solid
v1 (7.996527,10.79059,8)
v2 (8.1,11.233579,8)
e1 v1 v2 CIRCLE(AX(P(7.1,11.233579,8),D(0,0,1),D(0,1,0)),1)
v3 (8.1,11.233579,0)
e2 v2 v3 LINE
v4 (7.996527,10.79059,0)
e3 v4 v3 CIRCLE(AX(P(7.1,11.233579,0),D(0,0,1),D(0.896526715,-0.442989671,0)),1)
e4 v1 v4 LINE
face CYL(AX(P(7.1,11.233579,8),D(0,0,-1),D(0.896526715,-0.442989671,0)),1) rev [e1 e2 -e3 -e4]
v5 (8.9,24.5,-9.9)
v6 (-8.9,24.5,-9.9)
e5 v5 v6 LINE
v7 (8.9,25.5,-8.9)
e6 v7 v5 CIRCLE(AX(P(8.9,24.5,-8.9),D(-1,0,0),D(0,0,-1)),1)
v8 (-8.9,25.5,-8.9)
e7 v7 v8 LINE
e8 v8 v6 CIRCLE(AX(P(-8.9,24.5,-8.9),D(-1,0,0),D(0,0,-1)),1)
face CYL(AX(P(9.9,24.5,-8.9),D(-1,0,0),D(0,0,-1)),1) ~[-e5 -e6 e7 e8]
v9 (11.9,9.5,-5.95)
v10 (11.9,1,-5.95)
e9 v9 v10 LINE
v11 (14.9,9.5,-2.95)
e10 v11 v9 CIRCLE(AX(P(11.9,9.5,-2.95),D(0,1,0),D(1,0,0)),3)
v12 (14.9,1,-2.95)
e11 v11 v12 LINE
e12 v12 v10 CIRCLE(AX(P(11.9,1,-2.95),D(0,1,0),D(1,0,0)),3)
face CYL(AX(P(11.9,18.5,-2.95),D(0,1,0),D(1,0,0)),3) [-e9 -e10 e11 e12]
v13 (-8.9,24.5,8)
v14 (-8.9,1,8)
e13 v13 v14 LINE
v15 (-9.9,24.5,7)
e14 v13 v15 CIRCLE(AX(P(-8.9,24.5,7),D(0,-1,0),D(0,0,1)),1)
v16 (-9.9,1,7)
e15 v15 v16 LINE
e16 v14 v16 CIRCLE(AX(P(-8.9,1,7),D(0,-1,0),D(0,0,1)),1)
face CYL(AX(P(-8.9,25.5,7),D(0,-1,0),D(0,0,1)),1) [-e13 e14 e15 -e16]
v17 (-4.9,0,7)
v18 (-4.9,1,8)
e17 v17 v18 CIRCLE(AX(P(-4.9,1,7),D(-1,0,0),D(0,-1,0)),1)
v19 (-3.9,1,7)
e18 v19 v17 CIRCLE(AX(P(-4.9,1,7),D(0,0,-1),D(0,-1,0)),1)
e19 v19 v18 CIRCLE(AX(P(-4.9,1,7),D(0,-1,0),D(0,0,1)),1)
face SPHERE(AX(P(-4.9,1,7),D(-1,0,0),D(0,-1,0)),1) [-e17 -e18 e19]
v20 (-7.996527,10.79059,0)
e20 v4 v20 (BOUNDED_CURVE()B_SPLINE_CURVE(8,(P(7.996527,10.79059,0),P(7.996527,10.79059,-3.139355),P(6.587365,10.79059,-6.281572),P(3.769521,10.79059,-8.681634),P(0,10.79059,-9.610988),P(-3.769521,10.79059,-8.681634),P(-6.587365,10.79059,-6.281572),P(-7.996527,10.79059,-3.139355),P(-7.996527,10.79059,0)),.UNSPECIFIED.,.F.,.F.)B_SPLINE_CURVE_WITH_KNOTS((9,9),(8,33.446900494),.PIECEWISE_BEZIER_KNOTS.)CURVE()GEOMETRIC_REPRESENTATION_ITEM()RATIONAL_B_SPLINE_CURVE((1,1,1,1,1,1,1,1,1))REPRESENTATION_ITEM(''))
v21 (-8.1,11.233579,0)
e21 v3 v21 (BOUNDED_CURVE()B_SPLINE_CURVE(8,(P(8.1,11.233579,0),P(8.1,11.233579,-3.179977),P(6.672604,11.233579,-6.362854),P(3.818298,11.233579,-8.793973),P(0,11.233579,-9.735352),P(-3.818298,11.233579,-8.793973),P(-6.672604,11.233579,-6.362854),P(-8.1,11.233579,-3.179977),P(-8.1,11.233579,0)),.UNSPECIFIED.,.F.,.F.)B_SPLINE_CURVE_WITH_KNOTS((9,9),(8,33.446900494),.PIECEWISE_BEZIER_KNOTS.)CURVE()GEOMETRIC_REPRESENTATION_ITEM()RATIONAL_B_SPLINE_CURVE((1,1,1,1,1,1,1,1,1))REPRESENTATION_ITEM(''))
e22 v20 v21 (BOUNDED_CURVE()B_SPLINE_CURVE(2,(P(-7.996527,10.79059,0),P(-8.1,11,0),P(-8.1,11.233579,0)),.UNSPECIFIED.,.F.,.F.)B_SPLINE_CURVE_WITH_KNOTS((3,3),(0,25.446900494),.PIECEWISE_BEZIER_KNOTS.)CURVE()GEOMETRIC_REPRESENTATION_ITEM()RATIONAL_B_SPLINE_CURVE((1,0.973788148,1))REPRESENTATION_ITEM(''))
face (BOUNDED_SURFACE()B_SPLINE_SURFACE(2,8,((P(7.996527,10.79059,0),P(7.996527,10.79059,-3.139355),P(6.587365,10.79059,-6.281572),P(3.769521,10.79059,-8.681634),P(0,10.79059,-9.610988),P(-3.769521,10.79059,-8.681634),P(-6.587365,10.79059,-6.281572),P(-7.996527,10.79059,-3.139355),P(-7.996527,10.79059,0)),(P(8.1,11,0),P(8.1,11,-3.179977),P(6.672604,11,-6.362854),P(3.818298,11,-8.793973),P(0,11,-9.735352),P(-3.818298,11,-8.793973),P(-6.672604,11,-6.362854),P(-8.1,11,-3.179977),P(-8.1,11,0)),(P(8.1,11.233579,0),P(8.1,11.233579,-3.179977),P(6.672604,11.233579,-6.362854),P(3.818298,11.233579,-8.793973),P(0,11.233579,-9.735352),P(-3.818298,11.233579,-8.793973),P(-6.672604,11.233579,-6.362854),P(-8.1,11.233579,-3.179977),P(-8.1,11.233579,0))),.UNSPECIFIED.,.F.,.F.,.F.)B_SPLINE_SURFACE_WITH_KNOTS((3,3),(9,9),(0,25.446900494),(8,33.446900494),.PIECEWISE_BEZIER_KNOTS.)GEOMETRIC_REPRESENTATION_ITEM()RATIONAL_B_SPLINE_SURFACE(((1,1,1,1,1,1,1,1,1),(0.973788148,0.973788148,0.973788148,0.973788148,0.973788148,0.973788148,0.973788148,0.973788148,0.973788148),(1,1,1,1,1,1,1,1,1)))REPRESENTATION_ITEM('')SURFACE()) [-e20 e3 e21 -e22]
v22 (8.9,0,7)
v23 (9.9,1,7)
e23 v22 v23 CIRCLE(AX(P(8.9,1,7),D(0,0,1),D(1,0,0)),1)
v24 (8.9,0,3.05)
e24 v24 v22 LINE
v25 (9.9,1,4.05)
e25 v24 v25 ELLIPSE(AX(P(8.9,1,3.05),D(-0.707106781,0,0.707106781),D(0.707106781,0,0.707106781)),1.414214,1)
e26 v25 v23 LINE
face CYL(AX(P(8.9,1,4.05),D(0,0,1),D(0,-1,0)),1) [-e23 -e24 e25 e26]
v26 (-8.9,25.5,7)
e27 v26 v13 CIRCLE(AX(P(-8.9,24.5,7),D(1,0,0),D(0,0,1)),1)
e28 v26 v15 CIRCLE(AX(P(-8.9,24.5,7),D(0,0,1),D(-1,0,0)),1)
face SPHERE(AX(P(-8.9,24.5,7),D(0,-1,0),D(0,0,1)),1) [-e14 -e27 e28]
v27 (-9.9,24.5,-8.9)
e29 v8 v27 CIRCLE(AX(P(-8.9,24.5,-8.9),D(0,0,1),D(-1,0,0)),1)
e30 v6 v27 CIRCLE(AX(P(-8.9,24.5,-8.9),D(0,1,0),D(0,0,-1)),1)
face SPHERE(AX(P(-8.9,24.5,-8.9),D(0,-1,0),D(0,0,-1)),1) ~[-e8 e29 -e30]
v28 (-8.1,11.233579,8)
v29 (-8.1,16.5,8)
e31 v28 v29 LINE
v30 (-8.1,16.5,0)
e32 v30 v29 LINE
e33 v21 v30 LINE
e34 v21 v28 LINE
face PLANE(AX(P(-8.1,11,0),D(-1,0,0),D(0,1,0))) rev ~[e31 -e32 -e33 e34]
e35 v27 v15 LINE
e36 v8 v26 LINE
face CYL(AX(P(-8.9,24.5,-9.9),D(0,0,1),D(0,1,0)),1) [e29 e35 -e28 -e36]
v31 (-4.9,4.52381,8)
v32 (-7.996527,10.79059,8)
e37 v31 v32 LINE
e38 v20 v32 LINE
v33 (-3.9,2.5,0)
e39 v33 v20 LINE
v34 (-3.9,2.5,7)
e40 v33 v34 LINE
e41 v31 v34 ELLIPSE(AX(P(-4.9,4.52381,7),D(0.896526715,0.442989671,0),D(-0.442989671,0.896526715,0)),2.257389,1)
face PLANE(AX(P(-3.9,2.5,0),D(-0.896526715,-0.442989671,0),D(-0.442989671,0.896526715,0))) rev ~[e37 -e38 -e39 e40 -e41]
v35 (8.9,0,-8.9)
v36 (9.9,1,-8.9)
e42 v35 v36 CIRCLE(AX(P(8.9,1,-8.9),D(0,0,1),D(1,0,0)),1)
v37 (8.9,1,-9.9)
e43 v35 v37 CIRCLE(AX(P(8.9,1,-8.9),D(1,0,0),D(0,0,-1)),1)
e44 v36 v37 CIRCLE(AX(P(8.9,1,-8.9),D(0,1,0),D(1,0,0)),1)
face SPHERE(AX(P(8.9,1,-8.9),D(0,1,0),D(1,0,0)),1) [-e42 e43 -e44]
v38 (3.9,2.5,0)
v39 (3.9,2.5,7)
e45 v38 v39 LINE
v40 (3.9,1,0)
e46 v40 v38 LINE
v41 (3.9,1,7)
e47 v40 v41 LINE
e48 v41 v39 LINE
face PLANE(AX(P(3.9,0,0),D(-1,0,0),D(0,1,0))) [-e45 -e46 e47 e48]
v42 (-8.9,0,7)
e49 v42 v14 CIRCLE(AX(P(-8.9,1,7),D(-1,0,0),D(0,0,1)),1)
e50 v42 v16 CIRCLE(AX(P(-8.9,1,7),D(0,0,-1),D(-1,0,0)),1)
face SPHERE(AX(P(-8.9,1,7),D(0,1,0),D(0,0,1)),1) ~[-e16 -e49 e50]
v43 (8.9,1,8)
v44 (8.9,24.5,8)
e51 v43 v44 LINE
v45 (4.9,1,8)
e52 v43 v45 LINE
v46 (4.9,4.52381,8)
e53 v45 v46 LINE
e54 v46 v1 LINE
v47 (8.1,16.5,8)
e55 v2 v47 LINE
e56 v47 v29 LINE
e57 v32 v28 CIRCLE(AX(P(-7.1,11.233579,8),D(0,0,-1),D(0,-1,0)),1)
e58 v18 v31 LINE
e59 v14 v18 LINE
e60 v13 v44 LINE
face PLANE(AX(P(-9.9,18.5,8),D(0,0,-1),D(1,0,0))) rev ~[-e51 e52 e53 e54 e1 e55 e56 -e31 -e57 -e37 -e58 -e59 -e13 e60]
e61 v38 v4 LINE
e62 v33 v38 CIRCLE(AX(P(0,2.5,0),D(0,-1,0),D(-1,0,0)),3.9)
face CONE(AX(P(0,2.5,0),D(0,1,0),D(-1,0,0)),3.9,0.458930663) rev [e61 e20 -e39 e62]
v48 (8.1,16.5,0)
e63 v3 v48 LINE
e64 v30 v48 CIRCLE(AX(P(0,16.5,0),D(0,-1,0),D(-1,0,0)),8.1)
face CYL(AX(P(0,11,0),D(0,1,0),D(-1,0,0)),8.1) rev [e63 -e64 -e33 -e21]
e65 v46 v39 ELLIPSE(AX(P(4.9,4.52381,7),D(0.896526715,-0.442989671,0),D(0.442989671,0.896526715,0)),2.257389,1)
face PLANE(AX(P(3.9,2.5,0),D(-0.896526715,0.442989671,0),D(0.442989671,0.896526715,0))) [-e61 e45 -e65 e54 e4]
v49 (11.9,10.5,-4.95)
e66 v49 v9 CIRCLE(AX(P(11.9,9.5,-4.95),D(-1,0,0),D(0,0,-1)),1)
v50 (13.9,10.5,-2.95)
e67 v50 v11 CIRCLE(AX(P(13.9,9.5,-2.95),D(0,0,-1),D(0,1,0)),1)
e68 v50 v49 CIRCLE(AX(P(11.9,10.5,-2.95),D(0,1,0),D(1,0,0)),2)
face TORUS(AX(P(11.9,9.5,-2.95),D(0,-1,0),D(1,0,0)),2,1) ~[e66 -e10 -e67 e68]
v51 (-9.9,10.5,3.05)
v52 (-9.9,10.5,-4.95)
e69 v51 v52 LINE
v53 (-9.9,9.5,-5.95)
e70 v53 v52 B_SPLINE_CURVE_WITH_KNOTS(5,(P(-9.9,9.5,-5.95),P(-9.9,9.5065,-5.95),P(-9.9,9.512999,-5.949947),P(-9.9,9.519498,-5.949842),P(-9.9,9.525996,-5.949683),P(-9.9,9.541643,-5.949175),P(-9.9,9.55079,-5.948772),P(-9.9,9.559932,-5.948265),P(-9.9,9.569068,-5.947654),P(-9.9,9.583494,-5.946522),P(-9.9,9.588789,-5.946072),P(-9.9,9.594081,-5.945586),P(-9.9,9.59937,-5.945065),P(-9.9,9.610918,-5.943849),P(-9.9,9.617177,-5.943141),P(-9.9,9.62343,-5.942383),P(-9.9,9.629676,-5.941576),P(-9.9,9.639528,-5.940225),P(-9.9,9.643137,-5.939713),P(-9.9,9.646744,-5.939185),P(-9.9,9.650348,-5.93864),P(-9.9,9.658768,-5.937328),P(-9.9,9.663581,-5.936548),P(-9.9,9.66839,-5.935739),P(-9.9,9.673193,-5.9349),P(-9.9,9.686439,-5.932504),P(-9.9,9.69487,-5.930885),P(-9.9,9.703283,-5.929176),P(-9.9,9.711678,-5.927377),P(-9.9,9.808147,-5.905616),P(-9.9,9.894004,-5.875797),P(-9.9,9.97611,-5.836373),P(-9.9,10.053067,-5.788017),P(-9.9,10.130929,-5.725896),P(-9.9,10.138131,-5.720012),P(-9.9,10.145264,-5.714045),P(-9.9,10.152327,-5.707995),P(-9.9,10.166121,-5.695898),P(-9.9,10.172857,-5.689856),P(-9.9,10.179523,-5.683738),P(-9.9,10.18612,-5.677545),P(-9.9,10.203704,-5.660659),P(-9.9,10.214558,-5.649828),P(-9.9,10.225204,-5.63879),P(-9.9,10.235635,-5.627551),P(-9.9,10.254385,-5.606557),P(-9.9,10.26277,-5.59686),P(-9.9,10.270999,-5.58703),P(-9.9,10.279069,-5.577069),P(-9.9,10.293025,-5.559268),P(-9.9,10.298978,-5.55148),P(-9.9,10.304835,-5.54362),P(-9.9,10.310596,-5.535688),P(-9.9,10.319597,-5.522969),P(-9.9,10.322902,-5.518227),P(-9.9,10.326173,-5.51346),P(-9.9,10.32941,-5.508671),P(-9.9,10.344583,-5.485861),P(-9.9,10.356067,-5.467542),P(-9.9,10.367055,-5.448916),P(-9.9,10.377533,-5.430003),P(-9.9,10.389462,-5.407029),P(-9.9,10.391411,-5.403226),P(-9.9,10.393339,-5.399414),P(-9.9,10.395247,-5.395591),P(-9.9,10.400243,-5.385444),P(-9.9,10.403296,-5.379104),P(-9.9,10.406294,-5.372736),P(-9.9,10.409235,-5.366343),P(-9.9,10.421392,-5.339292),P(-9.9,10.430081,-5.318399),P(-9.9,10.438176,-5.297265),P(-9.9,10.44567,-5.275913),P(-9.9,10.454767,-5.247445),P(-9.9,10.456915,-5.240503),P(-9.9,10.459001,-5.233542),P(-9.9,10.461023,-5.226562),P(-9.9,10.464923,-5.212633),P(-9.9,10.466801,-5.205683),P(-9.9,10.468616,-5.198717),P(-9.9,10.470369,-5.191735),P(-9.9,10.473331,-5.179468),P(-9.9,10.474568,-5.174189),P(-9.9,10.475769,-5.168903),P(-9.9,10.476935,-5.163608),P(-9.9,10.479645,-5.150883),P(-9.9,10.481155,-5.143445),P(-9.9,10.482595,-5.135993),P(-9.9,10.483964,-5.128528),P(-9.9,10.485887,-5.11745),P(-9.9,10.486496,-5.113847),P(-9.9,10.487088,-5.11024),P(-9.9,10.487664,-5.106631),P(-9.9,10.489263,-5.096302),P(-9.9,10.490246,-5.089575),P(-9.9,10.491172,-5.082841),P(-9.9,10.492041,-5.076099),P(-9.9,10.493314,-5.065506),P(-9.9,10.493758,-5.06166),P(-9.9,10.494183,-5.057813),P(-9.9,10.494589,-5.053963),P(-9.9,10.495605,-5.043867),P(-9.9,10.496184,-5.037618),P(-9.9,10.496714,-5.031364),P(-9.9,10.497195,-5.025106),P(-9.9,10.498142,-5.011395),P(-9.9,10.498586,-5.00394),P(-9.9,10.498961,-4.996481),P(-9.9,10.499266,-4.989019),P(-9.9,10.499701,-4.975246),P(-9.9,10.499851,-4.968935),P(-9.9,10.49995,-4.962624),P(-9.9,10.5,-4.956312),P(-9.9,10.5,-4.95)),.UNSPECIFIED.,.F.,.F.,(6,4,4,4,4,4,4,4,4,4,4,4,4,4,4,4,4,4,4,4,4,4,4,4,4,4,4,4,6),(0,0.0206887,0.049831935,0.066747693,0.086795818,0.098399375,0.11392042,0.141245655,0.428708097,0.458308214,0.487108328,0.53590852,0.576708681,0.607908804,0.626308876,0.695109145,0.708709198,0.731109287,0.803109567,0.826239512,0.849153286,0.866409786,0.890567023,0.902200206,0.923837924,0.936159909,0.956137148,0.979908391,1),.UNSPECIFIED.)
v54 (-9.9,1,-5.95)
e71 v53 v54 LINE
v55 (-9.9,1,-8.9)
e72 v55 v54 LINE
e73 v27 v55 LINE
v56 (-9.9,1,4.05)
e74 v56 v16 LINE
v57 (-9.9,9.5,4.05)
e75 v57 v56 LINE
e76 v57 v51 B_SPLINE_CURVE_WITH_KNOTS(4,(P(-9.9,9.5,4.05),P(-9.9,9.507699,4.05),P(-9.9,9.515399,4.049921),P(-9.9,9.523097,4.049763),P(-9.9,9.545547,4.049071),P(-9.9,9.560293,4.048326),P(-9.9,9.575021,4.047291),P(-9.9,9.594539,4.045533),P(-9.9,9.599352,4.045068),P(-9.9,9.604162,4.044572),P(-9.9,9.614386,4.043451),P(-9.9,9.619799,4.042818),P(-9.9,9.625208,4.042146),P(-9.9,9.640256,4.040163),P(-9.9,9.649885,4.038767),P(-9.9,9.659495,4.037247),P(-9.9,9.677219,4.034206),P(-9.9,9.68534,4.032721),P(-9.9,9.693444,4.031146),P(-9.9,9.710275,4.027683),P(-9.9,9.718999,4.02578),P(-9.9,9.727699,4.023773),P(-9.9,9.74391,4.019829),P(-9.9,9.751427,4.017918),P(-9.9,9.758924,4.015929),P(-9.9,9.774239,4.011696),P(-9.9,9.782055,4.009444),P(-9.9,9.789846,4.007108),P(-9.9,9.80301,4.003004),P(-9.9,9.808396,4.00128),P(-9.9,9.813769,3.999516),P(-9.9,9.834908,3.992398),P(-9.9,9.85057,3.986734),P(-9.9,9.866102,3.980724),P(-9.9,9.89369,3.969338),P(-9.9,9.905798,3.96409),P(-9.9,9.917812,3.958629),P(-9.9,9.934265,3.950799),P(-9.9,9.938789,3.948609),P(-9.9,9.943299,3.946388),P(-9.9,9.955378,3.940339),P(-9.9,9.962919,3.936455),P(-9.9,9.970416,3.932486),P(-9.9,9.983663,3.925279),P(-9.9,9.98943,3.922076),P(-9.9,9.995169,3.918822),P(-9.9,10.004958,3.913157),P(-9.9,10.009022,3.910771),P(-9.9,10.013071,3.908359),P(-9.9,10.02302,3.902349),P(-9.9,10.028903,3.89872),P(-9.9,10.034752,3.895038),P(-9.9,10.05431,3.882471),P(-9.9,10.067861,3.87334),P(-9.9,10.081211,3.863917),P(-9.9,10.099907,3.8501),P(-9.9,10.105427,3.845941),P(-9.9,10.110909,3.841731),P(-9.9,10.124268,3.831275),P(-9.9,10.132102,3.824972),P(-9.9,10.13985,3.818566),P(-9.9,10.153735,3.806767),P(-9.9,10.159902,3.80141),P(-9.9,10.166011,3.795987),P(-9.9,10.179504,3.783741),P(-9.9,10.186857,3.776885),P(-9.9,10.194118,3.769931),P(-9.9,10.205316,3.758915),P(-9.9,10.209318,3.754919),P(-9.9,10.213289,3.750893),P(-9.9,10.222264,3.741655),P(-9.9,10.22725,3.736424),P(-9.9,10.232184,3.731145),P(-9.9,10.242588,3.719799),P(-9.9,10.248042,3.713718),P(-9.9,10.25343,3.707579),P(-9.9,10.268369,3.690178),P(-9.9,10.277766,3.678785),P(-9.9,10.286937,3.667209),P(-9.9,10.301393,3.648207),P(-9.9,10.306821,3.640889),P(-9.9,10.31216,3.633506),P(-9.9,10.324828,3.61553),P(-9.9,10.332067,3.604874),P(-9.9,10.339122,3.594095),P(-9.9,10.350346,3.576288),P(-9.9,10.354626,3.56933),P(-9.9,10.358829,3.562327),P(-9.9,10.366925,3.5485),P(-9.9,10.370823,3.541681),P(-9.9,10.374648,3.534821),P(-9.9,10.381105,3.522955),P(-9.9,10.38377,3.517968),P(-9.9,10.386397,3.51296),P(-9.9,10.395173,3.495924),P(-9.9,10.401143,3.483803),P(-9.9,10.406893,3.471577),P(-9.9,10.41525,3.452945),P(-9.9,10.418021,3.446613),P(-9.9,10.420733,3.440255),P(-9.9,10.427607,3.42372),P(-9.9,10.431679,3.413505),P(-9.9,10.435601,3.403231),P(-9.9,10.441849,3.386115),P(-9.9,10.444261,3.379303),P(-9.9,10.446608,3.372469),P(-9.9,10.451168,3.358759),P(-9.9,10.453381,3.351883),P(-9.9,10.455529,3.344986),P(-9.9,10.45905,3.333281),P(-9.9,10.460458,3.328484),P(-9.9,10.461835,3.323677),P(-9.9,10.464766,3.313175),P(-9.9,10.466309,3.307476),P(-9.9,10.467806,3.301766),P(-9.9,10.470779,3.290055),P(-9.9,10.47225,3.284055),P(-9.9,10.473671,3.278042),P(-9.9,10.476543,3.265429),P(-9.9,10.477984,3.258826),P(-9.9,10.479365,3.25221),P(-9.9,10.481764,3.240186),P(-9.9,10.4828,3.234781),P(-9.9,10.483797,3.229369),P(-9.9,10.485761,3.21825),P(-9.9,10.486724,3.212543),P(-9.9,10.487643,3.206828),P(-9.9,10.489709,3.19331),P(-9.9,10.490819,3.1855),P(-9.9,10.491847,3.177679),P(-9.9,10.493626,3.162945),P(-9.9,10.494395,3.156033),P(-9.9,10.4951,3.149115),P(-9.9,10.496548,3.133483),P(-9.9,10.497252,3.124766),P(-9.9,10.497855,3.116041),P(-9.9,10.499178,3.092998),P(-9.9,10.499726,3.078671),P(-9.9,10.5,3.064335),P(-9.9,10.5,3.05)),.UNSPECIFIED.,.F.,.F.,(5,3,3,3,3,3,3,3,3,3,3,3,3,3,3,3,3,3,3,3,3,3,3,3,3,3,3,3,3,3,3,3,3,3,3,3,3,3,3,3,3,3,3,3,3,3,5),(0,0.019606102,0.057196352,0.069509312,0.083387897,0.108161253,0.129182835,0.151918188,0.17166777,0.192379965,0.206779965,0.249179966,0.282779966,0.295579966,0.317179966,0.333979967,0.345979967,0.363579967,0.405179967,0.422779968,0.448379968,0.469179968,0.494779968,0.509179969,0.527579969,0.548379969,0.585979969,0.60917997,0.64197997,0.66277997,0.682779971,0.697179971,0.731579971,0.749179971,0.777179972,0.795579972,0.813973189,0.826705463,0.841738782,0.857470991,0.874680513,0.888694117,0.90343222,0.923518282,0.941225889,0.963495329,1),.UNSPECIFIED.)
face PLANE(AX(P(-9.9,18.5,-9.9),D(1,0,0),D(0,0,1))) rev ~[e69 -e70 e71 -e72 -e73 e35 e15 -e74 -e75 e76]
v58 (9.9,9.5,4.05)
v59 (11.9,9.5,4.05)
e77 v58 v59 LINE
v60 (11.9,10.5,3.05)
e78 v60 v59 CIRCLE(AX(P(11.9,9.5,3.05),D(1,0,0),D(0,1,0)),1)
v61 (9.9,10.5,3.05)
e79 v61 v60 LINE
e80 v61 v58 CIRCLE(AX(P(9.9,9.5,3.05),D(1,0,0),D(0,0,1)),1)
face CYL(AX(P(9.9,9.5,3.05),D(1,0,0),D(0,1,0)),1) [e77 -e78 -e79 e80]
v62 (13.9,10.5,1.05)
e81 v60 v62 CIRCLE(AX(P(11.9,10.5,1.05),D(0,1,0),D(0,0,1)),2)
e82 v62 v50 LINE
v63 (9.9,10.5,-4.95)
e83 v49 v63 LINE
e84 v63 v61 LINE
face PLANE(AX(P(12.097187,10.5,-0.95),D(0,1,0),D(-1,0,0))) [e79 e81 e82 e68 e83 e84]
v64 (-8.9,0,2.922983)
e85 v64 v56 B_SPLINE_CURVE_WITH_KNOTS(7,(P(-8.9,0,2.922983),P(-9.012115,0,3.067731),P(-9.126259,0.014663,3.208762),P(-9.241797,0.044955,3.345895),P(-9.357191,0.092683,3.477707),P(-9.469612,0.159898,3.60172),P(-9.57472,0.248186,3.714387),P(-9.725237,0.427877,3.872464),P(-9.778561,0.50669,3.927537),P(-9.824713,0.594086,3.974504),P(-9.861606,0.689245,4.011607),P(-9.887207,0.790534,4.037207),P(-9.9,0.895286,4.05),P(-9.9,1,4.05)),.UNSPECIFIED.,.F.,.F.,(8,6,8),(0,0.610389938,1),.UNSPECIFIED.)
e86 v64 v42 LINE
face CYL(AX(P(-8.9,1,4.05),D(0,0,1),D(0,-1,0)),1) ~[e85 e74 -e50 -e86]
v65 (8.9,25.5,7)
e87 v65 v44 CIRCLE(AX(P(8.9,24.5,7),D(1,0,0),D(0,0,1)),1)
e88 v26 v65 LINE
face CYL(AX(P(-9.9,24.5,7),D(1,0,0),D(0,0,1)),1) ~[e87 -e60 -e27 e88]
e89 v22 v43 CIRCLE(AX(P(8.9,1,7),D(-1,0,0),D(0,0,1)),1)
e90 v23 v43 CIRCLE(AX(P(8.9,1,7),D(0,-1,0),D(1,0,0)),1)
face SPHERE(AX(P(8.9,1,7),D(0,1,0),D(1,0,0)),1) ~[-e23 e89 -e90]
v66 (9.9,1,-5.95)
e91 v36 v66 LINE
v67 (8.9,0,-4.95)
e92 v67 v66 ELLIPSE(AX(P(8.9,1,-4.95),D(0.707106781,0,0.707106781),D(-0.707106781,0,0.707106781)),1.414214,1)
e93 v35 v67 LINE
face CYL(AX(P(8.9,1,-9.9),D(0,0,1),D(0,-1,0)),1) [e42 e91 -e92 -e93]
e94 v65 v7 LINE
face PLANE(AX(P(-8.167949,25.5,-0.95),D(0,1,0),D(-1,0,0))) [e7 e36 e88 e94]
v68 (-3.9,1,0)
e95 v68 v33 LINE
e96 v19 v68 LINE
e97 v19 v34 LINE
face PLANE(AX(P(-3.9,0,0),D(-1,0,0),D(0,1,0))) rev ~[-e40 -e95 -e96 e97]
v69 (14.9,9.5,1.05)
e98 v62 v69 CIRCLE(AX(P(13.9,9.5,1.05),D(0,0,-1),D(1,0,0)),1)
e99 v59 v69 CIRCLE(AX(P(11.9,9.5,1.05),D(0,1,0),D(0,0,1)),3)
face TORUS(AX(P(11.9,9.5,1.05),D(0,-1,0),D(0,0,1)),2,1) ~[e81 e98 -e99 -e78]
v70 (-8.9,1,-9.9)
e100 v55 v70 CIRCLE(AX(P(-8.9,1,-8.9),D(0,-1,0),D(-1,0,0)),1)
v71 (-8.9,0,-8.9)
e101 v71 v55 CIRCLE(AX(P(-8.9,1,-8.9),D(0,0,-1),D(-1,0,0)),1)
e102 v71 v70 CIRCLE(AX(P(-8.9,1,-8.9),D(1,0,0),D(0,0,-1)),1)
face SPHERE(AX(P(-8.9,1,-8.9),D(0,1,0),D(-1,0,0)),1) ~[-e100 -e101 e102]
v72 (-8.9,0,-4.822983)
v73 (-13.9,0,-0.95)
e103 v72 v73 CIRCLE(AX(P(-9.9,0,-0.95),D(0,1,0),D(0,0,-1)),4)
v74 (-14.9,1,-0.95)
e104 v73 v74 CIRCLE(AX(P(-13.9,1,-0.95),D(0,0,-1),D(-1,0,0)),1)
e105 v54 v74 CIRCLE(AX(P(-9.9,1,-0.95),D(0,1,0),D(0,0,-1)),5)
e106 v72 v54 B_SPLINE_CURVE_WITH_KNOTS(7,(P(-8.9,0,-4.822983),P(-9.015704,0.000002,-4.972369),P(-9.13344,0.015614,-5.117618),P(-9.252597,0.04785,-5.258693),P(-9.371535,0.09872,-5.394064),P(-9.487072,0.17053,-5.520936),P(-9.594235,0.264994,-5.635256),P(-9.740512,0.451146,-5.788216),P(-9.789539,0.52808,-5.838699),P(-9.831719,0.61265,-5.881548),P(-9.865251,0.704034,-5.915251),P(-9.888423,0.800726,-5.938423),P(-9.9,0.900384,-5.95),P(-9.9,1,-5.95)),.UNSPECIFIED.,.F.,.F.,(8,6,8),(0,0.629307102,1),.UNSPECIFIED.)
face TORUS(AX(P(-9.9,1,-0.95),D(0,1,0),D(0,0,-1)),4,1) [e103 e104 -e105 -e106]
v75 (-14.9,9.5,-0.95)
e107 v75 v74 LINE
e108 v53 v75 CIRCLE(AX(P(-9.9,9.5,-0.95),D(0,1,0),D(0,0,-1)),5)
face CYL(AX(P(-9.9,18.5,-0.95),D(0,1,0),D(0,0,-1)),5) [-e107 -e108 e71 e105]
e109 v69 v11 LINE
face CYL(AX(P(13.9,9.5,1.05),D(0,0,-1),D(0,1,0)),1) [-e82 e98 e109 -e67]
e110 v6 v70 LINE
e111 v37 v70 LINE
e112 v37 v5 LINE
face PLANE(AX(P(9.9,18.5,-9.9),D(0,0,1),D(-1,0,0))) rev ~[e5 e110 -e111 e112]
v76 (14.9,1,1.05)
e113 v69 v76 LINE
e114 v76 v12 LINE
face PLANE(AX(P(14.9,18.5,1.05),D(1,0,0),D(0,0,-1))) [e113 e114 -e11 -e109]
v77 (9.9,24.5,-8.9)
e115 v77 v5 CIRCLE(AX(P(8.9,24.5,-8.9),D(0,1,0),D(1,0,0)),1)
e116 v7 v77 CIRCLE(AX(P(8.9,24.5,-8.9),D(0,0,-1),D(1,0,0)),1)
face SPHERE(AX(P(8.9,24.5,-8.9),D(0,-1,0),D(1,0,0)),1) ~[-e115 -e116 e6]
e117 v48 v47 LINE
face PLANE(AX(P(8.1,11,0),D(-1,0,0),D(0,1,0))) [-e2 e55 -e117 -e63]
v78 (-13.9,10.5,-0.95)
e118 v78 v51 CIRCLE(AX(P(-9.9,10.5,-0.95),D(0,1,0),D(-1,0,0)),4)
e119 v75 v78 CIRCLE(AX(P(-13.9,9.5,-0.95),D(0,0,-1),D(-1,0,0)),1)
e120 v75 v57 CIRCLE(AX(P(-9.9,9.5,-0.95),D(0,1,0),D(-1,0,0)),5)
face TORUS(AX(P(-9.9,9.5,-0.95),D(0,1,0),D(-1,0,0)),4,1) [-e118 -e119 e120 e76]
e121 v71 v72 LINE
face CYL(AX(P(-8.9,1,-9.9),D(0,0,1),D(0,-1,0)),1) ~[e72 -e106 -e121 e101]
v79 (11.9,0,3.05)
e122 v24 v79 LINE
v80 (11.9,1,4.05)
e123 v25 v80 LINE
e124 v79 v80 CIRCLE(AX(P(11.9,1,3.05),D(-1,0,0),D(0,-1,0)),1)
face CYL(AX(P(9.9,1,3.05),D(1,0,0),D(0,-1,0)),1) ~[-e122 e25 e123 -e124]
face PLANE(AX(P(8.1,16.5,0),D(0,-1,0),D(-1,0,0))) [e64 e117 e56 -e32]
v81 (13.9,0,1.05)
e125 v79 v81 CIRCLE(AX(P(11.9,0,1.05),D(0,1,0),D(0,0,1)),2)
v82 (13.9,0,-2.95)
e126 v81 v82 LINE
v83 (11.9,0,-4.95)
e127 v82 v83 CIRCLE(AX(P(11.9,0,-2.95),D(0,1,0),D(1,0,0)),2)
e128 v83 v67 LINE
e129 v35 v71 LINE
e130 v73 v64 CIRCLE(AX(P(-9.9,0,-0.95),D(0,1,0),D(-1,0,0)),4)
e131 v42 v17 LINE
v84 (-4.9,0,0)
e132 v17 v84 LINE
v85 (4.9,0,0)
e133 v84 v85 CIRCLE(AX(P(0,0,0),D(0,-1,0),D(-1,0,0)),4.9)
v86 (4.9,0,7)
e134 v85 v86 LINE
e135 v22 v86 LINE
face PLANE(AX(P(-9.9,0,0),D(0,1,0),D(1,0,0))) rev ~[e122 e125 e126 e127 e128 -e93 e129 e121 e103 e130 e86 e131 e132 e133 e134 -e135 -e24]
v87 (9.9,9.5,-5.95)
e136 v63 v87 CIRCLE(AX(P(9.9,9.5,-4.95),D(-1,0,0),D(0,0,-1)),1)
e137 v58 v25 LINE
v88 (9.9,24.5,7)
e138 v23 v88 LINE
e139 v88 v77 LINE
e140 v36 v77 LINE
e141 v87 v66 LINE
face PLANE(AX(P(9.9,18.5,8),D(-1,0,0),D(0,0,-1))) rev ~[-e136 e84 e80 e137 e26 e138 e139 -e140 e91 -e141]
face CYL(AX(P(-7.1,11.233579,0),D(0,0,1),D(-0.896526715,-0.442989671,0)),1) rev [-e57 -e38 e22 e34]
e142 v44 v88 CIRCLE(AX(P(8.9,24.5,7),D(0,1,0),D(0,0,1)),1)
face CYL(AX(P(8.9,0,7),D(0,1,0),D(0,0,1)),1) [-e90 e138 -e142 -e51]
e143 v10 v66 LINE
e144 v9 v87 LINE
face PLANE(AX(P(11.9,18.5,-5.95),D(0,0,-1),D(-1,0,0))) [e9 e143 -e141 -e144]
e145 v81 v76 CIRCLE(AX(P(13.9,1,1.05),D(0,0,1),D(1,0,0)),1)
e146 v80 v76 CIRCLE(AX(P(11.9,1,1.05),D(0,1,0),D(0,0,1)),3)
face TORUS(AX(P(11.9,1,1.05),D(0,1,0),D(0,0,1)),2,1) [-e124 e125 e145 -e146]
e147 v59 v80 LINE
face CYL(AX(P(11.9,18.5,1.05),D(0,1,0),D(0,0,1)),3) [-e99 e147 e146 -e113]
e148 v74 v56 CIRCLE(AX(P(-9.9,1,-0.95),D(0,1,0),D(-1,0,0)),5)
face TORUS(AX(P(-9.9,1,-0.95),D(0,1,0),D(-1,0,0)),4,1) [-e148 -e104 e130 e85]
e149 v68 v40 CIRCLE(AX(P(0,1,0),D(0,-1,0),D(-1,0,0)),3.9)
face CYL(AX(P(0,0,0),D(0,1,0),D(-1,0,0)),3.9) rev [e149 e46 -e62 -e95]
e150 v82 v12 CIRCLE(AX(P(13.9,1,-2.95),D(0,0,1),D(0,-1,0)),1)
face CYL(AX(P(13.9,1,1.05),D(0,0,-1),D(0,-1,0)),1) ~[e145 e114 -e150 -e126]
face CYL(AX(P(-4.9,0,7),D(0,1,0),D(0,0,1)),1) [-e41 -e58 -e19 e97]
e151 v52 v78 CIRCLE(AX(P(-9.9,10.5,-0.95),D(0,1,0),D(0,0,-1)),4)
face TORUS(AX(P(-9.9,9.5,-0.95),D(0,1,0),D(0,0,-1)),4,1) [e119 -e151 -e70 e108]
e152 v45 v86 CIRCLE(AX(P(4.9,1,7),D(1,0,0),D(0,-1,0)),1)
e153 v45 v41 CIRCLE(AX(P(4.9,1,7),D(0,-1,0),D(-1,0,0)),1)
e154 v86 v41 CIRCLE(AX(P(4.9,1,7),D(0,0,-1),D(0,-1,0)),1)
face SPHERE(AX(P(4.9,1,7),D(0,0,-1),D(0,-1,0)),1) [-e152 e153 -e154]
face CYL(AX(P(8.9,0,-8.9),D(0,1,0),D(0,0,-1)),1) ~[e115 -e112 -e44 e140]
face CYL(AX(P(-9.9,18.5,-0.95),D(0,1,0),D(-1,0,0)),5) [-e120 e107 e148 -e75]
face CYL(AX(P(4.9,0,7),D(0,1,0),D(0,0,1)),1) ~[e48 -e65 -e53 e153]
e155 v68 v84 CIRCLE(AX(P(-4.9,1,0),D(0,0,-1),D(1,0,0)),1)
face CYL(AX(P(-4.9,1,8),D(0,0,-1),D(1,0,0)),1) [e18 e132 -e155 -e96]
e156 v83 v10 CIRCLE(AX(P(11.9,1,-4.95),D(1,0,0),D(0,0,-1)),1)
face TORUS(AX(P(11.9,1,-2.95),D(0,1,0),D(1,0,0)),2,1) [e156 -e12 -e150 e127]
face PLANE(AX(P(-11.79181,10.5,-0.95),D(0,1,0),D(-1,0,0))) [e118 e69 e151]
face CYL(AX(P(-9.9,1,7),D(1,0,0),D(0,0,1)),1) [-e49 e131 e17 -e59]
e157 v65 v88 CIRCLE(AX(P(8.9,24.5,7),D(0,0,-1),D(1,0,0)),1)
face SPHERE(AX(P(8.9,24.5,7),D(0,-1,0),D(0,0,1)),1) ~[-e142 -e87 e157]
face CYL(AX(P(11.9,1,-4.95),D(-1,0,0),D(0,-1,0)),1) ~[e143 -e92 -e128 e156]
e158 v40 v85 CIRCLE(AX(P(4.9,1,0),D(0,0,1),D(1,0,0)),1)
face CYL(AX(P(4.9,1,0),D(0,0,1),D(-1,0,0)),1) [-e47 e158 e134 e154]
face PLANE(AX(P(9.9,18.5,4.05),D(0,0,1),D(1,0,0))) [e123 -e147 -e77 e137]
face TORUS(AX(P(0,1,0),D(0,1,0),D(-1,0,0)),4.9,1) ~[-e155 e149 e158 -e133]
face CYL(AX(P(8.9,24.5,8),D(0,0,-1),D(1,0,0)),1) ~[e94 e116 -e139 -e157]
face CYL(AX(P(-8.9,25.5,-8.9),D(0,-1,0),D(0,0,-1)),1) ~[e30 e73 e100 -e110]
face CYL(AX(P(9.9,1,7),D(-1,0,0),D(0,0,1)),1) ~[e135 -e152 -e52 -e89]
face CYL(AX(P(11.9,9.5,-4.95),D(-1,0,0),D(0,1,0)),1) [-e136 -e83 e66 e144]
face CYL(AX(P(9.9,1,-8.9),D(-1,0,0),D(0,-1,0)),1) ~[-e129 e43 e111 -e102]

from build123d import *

# Parameters (mm, degrees)
F1_ANGLE = 180
F3_DEPTH = 18.5
F4_DEPTH = 8
F6_DEPTH = 18.5
F7_DEPTH = 8
F5_W     = 5
F5_H     = 10
F8_DEPTH = 7
F9_R     = 1


with BuildPart() as f1:
    # F0 (on Top) → F1 (revolve)
    with BuildSketch(Plane.XY):
        Polygon((-9.9, 18.5), (-9.9, 0), (-3.9, 0), (-3.9, 2.5), (-8.1, 11), (-8.1, 16.5), (0, 16.5), (0, 18.5), align=None)
    revolve(axis=Axis((0, -5.2679181099, 0), (0, -1, 0)), revolution_arc=F1_ANGLE)

    # F2 (on face) → F3 (join, through all)
    with BuildSketch(Plane(origin=(0, 18.5, 0), x_dir=(-1, 0, 0), z_dir=(0, 1, 0))):
        with BuildLine():
            ThreePointArc((4.3e-08, -9.9), (-7.0003571186, -7.0003571489), (-9.9, 0))
            Line((-9.9, 0), (-9.9, -9.9))
            Line((-9.9, -9.9), (4.3e-08, -9.9))
        make_face()
        with BuildLine():
            ThreePointArc((9.9, 0), (7.0003571489, -7.0003571186), (4.3e-08, -9.9))
            Line((4.3e-08, -9.9), (9.9, -9.9))
            Line((9.9, -9.9), (9.9, 0))
        make_face()
    extrude(amount=-F3_DEPTH)

    # F4 (add): a face of the model
    f4_faces = [f1.faces().sort_by_distance(p)[0] for p in [
        (-9.6290221411, 9.25, 0),
    ]]
    extrude(f4_faces, amount=F4_DEPTH)

    # F5 (on face) → F6 (join, through all)
    with BuildSketch(Plane(origin=(0, 18.5, 0), x_dir=(-1, 0, 0), z_dir=(0, 1, 0))):
        with BuildLine():
            ThreePointArc((9.9, -5.95), (13.4355339059, -4.4855339059), (14.9, -0.95))
            ThreePointArc((14.9, -0.95), (13.4355339059, 2.5855339059), (9.9, 4.05))
            Line((9.9, 4.05), (9.9, -5.95))
        make_face()
        with BuildLine():
            Line((-9.9, -5.95), (-9.9, 4.05))
            Line((-9.9, 4.05), (-11.9, 4.05))
            ThreePointArc((-11.9, 4.05), (-14.0213203436, 3.1713203436), (-14.9, 1.05))
            Line((-14.9, 1.05), (-14.9, -2.95))
            ThreePointArc((-14.9, -2.95), (-14.0213203436, -5.0713203436), (-11.9, -5.95))
            Line((-11.9, -5.95), (-9.9, -5.95))
        make_face()
    extrude(amount=-F6_DEPTH)

    # F5 (on face) → F7 (cut)
    with BuildSketch(Plane(origin=(0, 18.5, 0), x_dir=(-1, 0, 0), z_dir=(0, 1, 0))):
        with BuildLine():
            ThreePointArc((9.9, -5.95), (13.4355339059, -4.4855339059), (14.9, -0.95))
            ThreePointArc((14.9, -0.95), (13.4355339059, 2.5855339059), (9.9, 4.05))
            Line((9.9, 4.05), (9.9, -5.95))
        make_face()
        with BuildLine():
            Line((-9.9, -5.95), (-9.9, 4.05))
            Line((-9.9, 4.05), (-11.9, 4.05))
            ThreePointArc((-11.9, 4.05), (-14.0213203436, 3.1713203436), (-14.9, 1.05))
            Line((-14.9, 1.05), (-14.9, -2.95))
            ThreePointArc((-14.9, -2.95), (-14.0213203436, -5.0713203436), (-11.9, -5.95))
            Line((-11.9, -5.95), (-9.9, -5.95))
        make_face()
    extrude(amount=-F7_DEPTH, mode=Mode.SUBTRACT)

    # F5 (on face) → F8 (join)
    with BuildSketch(Plane(origin=(0, 18.5, 0), x_dir=(-1, 0, 0), z_dir=(0, 1, 0))):
        with BuildLine():
            Line((9.9, -5.95), (9.9, 4.05))
            ThreePointArc((9.9, 4.05), (4.9, -0.95), (9.9, -5.95))
        make_face()
        with BuildLine():
            ThreePointArc((9.9, -5.95), (4.9, -0.95), (9.9, 4.05))
            Line((9.9, 4.05), (9.9, 8))
            Line((9.9, 8), (-9.9, 8))
            Line((-9.9, 8), (-9.9, 4.05))
            Line((-9.9, 4.05), (-4.9, 4.05))
            Line((-4.9, 4.05), (-4.9, -5.95))
            Line((-4.9, -5.95), (-9.9, -5.95))
            Line((-9.9, -5.95), (-9.9, -9.9))
            Line((-9.9, -9.9), (9.9, -9.9))
            Line((9.9, -9.9), (9.9, -5.95))
        make_face()
        with Locations((-7.4, -0.95)):
            Rectangle(F5_W, F5_H)
    extrude(amount=F8_DEPTH)

    # F9
    f9_edges = [f1.edges().sort_by_distance(p)[0] for p in [
        (9.9, 12.75, 8),
        (-9.9, 12.75, 8),
        (9.9, 12.75, -9.9),
        (-9.9, 12.75, -9.9),
        (-6.9, 0, 8),
        (9.9, 0, 6.025),
        (9.9, 0, -7.925),
        (-9.9, 0, -7.925),
        (-9.9, 0, 6.025),
        (0, 0, -9.9),
        (0, 0, -3.9),
        (-3.9, 0, 4),
        (-14.9, 0, -0.95),
        (10.9, 0, -5.95),
        (14.02132, 0, -5.07132),
        (14.9, 0, -0.95),
        (14.02132, 0, 3.17132),
        (10.9, 0, 4.05),
        (6.9, 0, 8),
        (3.9, 0, 4),
        (0, 25.5, 8),
        (9.9, 25.5, -0.95),
        (0, 25.5, -9.9),
        (-9.9, 25.5, -0.95),
        (14.9, 10.5, -0.95),
        (-14.9, 10.5, -0.95),
        (-3.9, 1.25, 8),
        (-8.1, 11, 4),
        (3.9, 1.25, 8),
        (10.9, 10.5, -5.95),
        (14.02132, 10.5, -5.07132),
        (14.02132, 10.5, 3.17132),
        (10.9, 10.5, 4.05),
        (0, 11, -8.1),
        (8.1, 11, 4),
    ]]
    fillet(f9_edges, radius=F9_R)


solid = f1.part
